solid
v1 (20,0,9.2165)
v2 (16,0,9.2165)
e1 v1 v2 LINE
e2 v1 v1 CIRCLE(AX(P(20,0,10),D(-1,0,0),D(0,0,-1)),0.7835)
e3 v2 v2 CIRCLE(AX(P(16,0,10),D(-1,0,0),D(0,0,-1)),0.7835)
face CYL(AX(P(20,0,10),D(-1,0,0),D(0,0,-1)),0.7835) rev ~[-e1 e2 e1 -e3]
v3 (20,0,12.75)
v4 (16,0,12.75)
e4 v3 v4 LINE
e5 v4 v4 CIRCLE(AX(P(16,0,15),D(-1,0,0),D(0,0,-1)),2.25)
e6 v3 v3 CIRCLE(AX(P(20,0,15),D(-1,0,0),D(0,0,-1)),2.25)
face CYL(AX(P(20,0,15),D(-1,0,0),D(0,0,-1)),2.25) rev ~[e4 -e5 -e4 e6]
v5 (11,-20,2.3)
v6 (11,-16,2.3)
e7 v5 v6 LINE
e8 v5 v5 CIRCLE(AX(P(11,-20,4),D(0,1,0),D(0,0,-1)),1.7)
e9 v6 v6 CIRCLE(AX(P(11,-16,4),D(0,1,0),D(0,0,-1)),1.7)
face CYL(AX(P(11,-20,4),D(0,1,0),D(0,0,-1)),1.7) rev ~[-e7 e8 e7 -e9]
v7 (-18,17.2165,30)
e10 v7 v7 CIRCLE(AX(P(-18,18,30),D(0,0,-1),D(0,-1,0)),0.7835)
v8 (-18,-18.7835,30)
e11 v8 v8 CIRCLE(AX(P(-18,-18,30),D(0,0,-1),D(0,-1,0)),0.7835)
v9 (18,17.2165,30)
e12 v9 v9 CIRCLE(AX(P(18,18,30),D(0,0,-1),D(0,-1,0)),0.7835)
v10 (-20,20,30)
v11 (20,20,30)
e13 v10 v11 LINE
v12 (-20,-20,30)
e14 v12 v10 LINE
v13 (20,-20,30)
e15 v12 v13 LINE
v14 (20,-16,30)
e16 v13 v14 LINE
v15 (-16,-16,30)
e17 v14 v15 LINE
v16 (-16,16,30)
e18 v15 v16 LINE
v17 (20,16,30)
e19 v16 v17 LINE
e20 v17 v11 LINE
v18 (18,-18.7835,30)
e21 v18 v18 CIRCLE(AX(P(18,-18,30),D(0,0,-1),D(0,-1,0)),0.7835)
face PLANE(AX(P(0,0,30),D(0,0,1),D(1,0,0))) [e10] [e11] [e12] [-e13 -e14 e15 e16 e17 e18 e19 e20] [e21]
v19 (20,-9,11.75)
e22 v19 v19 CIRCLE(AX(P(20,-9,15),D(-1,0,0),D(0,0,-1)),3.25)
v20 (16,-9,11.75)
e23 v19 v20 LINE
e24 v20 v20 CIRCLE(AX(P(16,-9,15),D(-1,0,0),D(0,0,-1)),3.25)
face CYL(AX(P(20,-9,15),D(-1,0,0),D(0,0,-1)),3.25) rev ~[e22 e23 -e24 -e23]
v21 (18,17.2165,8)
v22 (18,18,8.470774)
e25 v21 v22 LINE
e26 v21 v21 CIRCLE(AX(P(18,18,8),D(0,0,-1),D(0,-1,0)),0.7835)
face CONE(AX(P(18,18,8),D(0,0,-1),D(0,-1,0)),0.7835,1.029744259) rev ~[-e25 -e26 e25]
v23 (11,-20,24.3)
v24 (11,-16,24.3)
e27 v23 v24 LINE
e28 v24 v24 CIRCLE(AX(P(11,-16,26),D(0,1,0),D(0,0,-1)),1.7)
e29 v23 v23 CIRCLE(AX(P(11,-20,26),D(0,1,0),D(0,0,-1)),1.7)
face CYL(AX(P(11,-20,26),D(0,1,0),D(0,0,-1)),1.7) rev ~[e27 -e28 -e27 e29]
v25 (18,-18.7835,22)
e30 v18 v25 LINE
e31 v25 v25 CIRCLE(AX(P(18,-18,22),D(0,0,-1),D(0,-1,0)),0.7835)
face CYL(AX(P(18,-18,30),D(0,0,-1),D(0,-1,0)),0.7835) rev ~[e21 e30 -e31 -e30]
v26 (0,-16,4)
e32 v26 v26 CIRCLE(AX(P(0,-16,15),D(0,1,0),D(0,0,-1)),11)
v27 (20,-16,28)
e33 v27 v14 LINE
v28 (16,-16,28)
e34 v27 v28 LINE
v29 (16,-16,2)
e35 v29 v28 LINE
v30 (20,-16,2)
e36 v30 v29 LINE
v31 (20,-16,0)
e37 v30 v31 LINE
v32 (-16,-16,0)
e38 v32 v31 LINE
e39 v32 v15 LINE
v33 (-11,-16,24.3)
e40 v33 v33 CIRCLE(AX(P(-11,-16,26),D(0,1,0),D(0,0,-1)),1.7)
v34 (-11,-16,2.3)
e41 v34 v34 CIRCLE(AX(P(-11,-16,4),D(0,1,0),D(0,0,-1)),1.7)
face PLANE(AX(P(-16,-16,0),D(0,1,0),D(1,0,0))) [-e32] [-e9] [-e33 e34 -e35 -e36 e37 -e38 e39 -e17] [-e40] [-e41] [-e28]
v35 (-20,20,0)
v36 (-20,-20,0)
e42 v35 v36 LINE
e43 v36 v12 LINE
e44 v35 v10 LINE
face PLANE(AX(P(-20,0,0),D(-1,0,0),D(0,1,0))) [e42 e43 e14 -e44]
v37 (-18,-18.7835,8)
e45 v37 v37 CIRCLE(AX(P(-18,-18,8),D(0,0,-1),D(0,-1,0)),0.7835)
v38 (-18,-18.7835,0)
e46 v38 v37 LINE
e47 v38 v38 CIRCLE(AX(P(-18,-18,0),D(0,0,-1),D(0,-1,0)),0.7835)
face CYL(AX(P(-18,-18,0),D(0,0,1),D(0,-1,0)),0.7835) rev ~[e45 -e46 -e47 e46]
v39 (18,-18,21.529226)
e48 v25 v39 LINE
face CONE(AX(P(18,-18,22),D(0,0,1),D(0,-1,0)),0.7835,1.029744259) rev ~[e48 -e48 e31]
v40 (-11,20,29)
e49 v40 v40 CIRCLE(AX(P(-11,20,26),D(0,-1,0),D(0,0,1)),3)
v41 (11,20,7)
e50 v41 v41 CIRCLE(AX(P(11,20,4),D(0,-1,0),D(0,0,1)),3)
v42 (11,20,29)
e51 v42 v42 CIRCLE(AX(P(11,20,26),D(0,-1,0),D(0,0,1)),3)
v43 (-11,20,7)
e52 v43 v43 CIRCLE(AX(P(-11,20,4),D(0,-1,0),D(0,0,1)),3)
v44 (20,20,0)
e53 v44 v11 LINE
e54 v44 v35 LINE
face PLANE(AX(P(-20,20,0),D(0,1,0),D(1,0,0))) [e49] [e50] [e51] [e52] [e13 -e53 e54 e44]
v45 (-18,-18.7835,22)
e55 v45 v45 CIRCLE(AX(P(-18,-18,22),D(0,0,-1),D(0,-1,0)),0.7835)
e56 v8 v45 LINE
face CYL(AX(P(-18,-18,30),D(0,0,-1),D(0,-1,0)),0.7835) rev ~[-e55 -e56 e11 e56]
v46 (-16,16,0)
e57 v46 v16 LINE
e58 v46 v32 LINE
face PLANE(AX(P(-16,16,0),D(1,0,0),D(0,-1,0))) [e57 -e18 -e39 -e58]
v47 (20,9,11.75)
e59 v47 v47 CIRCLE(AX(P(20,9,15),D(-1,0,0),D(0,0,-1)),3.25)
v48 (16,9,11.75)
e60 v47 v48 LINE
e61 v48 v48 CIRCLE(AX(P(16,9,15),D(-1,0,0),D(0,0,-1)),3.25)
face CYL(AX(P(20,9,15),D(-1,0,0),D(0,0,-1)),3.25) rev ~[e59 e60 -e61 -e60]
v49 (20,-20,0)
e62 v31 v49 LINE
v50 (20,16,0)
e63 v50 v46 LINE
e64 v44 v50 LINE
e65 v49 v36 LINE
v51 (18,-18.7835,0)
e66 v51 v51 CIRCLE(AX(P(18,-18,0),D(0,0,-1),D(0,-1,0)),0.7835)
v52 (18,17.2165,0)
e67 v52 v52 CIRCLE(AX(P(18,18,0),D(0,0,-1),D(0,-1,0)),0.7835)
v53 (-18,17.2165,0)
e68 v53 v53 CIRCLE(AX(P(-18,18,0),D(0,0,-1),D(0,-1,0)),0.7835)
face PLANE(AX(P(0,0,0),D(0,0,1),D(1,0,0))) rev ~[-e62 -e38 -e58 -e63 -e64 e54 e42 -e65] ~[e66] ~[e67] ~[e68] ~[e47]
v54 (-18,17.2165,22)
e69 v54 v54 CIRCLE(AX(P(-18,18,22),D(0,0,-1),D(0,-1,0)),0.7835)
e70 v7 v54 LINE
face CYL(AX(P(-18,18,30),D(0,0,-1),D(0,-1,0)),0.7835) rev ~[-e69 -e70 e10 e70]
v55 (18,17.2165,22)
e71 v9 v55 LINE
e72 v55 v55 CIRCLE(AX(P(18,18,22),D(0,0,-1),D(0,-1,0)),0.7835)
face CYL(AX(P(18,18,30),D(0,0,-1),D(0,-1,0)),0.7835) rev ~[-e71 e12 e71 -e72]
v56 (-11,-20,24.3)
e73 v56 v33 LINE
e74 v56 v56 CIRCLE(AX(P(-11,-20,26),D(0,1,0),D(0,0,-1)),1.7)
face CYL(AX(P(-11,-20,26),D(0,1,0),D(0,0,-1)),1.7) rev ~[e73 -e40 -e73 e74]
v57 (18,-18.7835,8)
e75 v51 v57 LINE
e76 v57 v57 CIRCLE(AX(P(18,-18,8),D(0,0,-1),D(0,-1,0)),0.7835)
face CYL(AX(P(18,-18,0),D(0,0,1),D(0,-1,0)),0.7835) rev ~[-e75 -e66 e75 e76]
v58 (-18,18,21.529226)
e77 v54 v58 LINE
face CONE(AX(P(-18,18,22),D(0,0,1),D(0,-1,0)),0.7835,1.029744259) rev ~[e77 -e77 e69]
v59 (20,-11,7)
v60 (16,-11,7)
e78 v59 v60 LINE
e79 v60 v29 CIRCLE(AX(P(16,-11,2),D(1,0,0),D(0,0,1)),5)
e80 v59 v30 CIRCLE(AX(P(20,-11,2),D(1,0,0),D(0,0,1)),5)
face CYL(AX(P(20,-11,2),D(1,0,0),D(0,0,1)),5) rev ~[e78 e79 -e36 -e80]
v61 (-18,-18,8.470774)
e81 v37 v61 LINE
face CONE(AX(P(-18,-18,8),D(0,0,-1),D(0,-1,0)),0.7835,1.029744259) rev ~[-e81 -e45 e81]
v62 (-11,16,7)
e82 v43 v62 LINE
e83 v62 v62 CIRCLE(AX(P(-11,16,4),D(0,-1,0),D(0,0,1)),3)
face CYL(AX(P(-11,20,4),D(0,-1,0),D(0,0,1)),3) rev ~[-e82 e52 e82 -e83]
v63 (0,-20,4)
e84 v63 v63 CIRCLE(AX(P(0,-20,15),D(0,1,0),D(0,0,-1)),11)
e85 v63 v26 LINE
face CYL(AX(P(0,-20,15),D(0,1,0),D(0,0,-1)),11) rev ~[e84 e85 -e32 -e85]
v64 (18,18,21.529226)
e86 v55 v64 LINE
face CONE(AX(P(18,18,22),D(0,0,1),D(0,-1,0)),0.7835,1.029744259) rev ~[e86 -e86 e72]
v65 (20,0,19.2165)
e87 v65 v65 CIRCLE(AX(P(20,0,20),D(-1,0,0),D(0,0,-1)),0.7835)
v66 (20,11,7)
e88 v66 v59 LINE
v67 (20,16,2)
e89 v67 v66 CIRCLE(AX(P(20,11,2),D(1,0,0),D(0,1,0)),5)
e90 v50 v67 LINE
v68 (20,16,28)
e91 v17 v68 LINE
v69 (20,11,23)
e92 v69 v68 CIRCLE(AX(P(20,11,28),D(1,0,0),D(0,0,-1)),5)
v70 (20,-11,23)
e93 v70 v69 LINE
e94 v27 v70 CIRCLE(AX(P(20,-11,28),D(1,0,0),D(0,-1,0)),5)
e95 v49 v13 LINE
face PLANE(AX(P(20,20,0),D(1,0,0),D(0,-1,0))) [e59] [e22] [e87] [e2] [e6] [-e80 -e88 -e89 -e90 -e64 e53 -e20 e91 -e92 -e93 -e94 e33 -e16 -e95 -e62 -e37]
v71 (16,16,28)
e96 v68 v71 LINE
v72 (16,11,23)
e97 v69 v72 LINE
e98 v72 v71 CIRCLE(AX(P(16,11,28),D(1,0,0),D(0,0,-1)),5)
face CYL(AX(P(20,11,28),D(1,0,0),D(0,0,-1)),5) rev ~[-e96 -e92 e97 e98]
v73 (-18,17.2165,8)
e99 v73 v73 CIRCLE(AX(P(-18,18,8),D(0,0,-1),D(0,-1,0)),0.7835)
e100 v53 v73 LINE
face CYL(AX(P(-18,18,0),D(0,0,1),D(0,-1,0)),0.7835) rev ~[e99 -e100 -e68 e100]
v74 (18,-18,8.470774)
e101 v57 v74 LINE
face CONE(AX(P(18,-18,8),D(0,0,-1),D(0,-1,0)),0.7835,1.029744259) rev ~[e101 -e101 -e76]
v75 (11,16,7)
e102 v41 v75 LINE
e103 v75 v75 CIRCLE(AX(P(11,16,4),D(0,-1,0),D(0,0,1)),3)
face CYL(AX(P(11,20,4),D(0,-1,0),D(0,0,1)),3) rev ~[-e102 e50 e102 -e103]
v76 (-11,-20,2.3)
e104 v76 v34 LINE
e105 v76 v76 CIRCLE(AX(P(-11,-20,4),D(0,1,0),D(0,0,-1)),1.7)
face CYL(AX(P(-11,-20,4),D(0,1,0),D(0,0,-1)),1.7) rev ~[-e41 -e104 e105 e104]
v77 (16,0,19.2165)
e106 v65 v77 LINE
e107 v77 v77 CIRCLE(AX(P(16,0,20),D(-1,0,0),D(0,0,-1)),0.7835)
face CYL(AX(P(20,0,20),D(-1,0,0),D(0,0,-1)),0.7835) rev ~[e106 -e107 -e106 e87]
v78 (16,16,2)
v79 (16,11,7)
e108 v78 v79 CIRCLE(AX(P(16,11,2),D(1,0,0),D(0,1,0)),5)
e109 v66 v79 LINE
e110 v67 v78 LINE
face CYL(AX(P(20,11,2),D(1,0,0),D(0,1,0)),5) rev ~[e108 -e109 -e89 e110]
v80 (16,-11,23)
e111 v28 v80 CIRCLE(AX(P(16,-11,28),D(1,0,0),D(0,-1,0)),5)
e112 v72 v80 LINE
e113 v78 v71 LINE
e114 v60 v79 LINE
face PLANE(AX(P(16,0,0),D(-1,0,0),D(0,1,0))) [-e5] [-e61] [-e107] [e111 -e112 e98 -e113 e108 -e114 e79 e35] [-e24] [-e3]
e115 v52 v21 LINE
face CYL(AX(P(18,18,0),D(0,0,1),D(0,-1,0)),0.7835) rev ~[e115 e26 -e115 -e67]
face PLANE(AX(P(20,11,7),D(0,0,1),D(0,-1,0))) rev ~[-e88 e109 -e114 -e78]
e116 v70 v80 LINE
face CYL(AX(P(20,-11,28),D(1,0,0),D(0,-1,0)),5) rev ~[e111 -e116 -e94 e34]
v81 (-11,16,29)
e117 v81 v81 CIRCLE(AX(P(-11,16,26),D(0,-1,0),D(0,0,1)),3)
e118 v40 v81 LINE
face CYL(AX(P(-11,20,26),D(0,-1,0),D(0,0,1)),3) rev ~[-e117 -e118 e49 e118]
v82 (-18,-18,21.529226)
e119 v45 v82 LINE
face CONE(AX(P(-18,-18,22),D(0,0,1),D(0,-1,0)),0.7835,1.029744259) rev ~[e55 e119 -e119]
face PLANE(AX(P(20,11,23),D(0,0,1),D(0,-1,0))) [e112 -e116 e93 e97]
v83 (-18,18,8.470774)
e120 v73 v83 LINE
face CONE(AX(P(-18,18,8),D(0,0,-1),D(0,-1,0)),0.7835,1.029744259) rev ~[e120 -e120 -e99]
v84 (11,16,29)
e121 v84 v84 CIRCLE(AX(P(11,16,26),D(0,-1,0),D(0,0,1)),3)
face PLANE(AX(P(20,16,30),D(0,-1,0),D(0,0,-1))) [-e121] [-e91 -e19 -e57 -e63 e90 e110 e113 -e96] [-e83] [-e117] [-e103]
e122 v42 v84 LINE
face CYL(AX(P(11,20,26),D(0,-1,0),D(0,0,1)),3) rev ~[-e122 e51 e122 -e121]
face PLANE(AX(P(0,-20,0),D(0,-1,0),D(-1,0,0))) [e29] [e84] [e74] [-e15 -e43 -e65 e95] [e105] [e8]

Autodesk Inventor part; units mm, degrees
ref_plane "YZ Plane" through (0, 0, 0) normal (1, 0, 0) x (0, 1, 0)
ref_plane "XZ Plane" through (0, 0, 0) normal (0, 1, 0) x (-1, 0, 0)
sketch "Skizze1" plane through (0, 0, 0) normal (0, 0, 1) x (1, 0, 0)
  line L0 (-20, 20) -> (20, 20)
  line L1 (20, 20) -> (20, -20)
  line L2 (20, -20) -> (-20, -20)
  line L3 (-20, -20) -> (-20, 20)
  line L4 (-28, 0) -> (28, 0) projected
  line L5 (0, -28) -> (0, 28) projected
  line L6 (16, 16) -> (-16, 16)
  line L7 (-16, 16) -> (-16, -16)
  line L8 (-16, -16) -> (16, -16)
  line L9 (16, -16) -> (16, 16)
  point P0 (0, 0)
  dimension "d0" = 40
  dimension "d1" = 4
extrude "Extrusion1" add sketch "Skizze1" along normal blind 30 contours L0 L5 L6 L7 L4 L3 | L0 L1 L4 L9 L6 L5 | L4 L7 L8 L5 L2 L3 | L1 L2 L5 L8 L9 L4
sketch "Skizze2" plane through (20, -20, 0) normal (1, 0, 0) x (0, 0, -1)
  line L0 (-30, 40) -> (-30, 0) projected
  line L1 (0, 0) -> (-30, 0) projected
  line L2 (0, 40) -> (-30, 40) projected
  line L3 (0, -8) -> (0, 48) projected
  line L4 (6, 20) -> (-36, 20) projected
  line L5 (-30, 36) -> (-28, 36)
  line L6 (-23, 31) -> (-23, 9)
  line L7 (-28, 4) -> (-30, 4)
  line L8 (-30, 4) -> (-30, 36)
  line L9 (0, 36) -> (-2, 36)
  line L10 (-7, 31) -> (-7, 9)
  line L11 (-2, 4) -> (0, 4)
  line L12 (0, 4) -> (0, 36)
  line L13 (-15, 40) -> (-15, 0)
  line L14 (0, 4) -> (-30, 4) projected
  arc A0 (-23, 31) -> (-28, 36) centre (-28, 31) ccw
  arc A1 (-28, 4) -> (-23, 9) centre (-28, 9) ccw
  arc A2 (-7, 9) -> (-2, 4) centre (-2, 9) ccw
  arc A3 (-2, 36) -> (-7, 31) centre (-2, 31) ccw
  point P0 (0, 20)
  dimension "d5" = 16
  dimension "d6" = 5
extrude "Extrusion2" cut sketch "Skizze2" against normal up to surface (4 mm away) contours L5 A0 L6 L4 L0 | L4 L6 A1 L7 L0 | L3 L4 L10 A3 L9 | L4 L3 L11 A2 L10
sketch "Skizze4" plane through (20, -20, 0) normal (1, 0, 0) x (0, 0, -1)
  circle A0 centre (-20, 20) radius 1.15 projected
  circle A1 centre (-10, 20) radius 1.15 projected
  point P0 (0, 20)
hole "Bohrung2" at (20, 0, 20) at (20, 0, 10) direction (-1, 0, 0) diameter 1.567 end up to surface thread size "M2x0.4" class "6H" standard "ISO Metric profile"
sketch "Skizze5" plane through (20, -20, 0) normal (1, 0, 0) x (0, 0, -1)
  circle A0 centre (-15, 20) radius 2 projected
  point P0 (0, 20)
hole "Bohrung3" at (20, 0, 15) direction (-1, 0, 0) diameter 4.5 end up to surface
sketch "Skizze6" plane through (-20, -20, 0) normal (0, -1, 0) x (1, 0, 0)
  line L0 (40, 30) -> (0, 30) projected
  line L1 (0, 0) -> (0, 30) projected
  line L2 (40, 0) -> (40, 30) projected
  line L3 (40, 15) -> (0, 15)
  line L4 (20, 0) -> (20, 30)
  point P0 (20, 15)
hole "Bohrung4" at (0, -20, 15) direction (0, 1, 0) diameter 22 end up to surface
sketch "Skizze7" plane through (20, -20, 0) normal (1, 0, 0) x (0, 0, -1)
  line L0 (0, 0) -> (-30, 0) projected
  line L1 (-7, 9) -> (-7, 31) projected
  line L2 (0, 40) -> (-30, 40) projected
  line L3 (-23, 31) -> (-23, 9) projected
  line L4 (-15, 0) -> (-15, 40)
  line L5 (-23, 20) -> (-7, 20)
  point P0 (0, 20)
  point P1 (-15, 11)
  point P2 (-15, 29)
  dimension "d43" = 18
hole "Bohrung5" at (20, -9, 15) at (20, 9, 15) direction (-1, 0, 0) diameter 6.5 end up to surface
sketch "Skizze8" plane through (-20, -20, 0) normal (0, -1, 0) x (1, 0, 0)
  circle A0 centre (20, 15) radius 11 projected
  line L0 (9, 26) -> (31, 26)
  line L1 (31, 26) -> (31, 4)
  line L2 (31, 4) -> (9, 4)
  line L3 (9, 4) -> (9, 26)
  line L4 (-8, 0) -> (48, 0) projected
  line L5 (20, -6) -> (20, 36) projected
  line L6 (20, 15) -> (29.164, 15)
  point P0 (20, 0)
  dimension "d51" = 22
hole "Bohrung6" at (-11, -20, 26) at (11, -20, 26) at (11, -20, 4) at (-11, -20, 4) direction (0, 1, 0) diameter 3.4 end through all
sketch "Skizze9" plane through (-20, 20, 0) normal (0, 1, 0) x (1, 0, 0)
  circle A0 centre (9, -4) radius 1.7 projected
  circle A1 centre (31, -4) radius 1.7 projected
  circle A2 centre (31, -26) radius 1.7 projected
  circle A3 centre (9, -26) radius 1.7 projected
  point P0 (20, 0)
hole "Bohrung7" at (-11, 20, 4) at (11, 20, 4) at (11, 20, 26) at (-11, 20, 26) direction (0, -1, 0) diameter 6 depth 8 tip angle 118
sketch "Skizze10" plane through (0, 0, 30) normal (0, 0, 1) x (1, 0, 0)
  line L0 (20, 20) -> (20, 16) projected
  line L1 (-20, 20) -> (20, 20) projected
  line L2 (-20, -20) -> (-20, 20) projected
  line L3 (20, -20) -> (-20, -20) projected
  line L4 (-18, 18) -> (18, 18)
  line L5 (18, 18) -> (18, -18)
  line L6 (18, -18) -> (-18, -18)
  line L7 (-18, -18) -> (-18, 18)
  point P0 (0, 0)
  dimension "d66" = 2
  dimension "d67" = 2
  dimension "d68" = 2
  dimension "d69" = 2
hole "Bohrung8" at (-18, 18, 30) at (18, 18, 30) at (18, -18, 30) at (-18, -18, 30) direction (0, 0, -1) diameter 1.567 depth 8 tip angle 118 thread size "M2x0.4" class "6H" standard "ISO Metric profile"
ref_plane "Arbeitsebene1" through (0, 0, 15) normal (0, 0, 1) x (1, 0, 0)
mirror "Spiegeln1" about plane through (0, 0, 15) normal (0, 0, 1) of "Bohrung8"
properties part number "13_0204_016"
